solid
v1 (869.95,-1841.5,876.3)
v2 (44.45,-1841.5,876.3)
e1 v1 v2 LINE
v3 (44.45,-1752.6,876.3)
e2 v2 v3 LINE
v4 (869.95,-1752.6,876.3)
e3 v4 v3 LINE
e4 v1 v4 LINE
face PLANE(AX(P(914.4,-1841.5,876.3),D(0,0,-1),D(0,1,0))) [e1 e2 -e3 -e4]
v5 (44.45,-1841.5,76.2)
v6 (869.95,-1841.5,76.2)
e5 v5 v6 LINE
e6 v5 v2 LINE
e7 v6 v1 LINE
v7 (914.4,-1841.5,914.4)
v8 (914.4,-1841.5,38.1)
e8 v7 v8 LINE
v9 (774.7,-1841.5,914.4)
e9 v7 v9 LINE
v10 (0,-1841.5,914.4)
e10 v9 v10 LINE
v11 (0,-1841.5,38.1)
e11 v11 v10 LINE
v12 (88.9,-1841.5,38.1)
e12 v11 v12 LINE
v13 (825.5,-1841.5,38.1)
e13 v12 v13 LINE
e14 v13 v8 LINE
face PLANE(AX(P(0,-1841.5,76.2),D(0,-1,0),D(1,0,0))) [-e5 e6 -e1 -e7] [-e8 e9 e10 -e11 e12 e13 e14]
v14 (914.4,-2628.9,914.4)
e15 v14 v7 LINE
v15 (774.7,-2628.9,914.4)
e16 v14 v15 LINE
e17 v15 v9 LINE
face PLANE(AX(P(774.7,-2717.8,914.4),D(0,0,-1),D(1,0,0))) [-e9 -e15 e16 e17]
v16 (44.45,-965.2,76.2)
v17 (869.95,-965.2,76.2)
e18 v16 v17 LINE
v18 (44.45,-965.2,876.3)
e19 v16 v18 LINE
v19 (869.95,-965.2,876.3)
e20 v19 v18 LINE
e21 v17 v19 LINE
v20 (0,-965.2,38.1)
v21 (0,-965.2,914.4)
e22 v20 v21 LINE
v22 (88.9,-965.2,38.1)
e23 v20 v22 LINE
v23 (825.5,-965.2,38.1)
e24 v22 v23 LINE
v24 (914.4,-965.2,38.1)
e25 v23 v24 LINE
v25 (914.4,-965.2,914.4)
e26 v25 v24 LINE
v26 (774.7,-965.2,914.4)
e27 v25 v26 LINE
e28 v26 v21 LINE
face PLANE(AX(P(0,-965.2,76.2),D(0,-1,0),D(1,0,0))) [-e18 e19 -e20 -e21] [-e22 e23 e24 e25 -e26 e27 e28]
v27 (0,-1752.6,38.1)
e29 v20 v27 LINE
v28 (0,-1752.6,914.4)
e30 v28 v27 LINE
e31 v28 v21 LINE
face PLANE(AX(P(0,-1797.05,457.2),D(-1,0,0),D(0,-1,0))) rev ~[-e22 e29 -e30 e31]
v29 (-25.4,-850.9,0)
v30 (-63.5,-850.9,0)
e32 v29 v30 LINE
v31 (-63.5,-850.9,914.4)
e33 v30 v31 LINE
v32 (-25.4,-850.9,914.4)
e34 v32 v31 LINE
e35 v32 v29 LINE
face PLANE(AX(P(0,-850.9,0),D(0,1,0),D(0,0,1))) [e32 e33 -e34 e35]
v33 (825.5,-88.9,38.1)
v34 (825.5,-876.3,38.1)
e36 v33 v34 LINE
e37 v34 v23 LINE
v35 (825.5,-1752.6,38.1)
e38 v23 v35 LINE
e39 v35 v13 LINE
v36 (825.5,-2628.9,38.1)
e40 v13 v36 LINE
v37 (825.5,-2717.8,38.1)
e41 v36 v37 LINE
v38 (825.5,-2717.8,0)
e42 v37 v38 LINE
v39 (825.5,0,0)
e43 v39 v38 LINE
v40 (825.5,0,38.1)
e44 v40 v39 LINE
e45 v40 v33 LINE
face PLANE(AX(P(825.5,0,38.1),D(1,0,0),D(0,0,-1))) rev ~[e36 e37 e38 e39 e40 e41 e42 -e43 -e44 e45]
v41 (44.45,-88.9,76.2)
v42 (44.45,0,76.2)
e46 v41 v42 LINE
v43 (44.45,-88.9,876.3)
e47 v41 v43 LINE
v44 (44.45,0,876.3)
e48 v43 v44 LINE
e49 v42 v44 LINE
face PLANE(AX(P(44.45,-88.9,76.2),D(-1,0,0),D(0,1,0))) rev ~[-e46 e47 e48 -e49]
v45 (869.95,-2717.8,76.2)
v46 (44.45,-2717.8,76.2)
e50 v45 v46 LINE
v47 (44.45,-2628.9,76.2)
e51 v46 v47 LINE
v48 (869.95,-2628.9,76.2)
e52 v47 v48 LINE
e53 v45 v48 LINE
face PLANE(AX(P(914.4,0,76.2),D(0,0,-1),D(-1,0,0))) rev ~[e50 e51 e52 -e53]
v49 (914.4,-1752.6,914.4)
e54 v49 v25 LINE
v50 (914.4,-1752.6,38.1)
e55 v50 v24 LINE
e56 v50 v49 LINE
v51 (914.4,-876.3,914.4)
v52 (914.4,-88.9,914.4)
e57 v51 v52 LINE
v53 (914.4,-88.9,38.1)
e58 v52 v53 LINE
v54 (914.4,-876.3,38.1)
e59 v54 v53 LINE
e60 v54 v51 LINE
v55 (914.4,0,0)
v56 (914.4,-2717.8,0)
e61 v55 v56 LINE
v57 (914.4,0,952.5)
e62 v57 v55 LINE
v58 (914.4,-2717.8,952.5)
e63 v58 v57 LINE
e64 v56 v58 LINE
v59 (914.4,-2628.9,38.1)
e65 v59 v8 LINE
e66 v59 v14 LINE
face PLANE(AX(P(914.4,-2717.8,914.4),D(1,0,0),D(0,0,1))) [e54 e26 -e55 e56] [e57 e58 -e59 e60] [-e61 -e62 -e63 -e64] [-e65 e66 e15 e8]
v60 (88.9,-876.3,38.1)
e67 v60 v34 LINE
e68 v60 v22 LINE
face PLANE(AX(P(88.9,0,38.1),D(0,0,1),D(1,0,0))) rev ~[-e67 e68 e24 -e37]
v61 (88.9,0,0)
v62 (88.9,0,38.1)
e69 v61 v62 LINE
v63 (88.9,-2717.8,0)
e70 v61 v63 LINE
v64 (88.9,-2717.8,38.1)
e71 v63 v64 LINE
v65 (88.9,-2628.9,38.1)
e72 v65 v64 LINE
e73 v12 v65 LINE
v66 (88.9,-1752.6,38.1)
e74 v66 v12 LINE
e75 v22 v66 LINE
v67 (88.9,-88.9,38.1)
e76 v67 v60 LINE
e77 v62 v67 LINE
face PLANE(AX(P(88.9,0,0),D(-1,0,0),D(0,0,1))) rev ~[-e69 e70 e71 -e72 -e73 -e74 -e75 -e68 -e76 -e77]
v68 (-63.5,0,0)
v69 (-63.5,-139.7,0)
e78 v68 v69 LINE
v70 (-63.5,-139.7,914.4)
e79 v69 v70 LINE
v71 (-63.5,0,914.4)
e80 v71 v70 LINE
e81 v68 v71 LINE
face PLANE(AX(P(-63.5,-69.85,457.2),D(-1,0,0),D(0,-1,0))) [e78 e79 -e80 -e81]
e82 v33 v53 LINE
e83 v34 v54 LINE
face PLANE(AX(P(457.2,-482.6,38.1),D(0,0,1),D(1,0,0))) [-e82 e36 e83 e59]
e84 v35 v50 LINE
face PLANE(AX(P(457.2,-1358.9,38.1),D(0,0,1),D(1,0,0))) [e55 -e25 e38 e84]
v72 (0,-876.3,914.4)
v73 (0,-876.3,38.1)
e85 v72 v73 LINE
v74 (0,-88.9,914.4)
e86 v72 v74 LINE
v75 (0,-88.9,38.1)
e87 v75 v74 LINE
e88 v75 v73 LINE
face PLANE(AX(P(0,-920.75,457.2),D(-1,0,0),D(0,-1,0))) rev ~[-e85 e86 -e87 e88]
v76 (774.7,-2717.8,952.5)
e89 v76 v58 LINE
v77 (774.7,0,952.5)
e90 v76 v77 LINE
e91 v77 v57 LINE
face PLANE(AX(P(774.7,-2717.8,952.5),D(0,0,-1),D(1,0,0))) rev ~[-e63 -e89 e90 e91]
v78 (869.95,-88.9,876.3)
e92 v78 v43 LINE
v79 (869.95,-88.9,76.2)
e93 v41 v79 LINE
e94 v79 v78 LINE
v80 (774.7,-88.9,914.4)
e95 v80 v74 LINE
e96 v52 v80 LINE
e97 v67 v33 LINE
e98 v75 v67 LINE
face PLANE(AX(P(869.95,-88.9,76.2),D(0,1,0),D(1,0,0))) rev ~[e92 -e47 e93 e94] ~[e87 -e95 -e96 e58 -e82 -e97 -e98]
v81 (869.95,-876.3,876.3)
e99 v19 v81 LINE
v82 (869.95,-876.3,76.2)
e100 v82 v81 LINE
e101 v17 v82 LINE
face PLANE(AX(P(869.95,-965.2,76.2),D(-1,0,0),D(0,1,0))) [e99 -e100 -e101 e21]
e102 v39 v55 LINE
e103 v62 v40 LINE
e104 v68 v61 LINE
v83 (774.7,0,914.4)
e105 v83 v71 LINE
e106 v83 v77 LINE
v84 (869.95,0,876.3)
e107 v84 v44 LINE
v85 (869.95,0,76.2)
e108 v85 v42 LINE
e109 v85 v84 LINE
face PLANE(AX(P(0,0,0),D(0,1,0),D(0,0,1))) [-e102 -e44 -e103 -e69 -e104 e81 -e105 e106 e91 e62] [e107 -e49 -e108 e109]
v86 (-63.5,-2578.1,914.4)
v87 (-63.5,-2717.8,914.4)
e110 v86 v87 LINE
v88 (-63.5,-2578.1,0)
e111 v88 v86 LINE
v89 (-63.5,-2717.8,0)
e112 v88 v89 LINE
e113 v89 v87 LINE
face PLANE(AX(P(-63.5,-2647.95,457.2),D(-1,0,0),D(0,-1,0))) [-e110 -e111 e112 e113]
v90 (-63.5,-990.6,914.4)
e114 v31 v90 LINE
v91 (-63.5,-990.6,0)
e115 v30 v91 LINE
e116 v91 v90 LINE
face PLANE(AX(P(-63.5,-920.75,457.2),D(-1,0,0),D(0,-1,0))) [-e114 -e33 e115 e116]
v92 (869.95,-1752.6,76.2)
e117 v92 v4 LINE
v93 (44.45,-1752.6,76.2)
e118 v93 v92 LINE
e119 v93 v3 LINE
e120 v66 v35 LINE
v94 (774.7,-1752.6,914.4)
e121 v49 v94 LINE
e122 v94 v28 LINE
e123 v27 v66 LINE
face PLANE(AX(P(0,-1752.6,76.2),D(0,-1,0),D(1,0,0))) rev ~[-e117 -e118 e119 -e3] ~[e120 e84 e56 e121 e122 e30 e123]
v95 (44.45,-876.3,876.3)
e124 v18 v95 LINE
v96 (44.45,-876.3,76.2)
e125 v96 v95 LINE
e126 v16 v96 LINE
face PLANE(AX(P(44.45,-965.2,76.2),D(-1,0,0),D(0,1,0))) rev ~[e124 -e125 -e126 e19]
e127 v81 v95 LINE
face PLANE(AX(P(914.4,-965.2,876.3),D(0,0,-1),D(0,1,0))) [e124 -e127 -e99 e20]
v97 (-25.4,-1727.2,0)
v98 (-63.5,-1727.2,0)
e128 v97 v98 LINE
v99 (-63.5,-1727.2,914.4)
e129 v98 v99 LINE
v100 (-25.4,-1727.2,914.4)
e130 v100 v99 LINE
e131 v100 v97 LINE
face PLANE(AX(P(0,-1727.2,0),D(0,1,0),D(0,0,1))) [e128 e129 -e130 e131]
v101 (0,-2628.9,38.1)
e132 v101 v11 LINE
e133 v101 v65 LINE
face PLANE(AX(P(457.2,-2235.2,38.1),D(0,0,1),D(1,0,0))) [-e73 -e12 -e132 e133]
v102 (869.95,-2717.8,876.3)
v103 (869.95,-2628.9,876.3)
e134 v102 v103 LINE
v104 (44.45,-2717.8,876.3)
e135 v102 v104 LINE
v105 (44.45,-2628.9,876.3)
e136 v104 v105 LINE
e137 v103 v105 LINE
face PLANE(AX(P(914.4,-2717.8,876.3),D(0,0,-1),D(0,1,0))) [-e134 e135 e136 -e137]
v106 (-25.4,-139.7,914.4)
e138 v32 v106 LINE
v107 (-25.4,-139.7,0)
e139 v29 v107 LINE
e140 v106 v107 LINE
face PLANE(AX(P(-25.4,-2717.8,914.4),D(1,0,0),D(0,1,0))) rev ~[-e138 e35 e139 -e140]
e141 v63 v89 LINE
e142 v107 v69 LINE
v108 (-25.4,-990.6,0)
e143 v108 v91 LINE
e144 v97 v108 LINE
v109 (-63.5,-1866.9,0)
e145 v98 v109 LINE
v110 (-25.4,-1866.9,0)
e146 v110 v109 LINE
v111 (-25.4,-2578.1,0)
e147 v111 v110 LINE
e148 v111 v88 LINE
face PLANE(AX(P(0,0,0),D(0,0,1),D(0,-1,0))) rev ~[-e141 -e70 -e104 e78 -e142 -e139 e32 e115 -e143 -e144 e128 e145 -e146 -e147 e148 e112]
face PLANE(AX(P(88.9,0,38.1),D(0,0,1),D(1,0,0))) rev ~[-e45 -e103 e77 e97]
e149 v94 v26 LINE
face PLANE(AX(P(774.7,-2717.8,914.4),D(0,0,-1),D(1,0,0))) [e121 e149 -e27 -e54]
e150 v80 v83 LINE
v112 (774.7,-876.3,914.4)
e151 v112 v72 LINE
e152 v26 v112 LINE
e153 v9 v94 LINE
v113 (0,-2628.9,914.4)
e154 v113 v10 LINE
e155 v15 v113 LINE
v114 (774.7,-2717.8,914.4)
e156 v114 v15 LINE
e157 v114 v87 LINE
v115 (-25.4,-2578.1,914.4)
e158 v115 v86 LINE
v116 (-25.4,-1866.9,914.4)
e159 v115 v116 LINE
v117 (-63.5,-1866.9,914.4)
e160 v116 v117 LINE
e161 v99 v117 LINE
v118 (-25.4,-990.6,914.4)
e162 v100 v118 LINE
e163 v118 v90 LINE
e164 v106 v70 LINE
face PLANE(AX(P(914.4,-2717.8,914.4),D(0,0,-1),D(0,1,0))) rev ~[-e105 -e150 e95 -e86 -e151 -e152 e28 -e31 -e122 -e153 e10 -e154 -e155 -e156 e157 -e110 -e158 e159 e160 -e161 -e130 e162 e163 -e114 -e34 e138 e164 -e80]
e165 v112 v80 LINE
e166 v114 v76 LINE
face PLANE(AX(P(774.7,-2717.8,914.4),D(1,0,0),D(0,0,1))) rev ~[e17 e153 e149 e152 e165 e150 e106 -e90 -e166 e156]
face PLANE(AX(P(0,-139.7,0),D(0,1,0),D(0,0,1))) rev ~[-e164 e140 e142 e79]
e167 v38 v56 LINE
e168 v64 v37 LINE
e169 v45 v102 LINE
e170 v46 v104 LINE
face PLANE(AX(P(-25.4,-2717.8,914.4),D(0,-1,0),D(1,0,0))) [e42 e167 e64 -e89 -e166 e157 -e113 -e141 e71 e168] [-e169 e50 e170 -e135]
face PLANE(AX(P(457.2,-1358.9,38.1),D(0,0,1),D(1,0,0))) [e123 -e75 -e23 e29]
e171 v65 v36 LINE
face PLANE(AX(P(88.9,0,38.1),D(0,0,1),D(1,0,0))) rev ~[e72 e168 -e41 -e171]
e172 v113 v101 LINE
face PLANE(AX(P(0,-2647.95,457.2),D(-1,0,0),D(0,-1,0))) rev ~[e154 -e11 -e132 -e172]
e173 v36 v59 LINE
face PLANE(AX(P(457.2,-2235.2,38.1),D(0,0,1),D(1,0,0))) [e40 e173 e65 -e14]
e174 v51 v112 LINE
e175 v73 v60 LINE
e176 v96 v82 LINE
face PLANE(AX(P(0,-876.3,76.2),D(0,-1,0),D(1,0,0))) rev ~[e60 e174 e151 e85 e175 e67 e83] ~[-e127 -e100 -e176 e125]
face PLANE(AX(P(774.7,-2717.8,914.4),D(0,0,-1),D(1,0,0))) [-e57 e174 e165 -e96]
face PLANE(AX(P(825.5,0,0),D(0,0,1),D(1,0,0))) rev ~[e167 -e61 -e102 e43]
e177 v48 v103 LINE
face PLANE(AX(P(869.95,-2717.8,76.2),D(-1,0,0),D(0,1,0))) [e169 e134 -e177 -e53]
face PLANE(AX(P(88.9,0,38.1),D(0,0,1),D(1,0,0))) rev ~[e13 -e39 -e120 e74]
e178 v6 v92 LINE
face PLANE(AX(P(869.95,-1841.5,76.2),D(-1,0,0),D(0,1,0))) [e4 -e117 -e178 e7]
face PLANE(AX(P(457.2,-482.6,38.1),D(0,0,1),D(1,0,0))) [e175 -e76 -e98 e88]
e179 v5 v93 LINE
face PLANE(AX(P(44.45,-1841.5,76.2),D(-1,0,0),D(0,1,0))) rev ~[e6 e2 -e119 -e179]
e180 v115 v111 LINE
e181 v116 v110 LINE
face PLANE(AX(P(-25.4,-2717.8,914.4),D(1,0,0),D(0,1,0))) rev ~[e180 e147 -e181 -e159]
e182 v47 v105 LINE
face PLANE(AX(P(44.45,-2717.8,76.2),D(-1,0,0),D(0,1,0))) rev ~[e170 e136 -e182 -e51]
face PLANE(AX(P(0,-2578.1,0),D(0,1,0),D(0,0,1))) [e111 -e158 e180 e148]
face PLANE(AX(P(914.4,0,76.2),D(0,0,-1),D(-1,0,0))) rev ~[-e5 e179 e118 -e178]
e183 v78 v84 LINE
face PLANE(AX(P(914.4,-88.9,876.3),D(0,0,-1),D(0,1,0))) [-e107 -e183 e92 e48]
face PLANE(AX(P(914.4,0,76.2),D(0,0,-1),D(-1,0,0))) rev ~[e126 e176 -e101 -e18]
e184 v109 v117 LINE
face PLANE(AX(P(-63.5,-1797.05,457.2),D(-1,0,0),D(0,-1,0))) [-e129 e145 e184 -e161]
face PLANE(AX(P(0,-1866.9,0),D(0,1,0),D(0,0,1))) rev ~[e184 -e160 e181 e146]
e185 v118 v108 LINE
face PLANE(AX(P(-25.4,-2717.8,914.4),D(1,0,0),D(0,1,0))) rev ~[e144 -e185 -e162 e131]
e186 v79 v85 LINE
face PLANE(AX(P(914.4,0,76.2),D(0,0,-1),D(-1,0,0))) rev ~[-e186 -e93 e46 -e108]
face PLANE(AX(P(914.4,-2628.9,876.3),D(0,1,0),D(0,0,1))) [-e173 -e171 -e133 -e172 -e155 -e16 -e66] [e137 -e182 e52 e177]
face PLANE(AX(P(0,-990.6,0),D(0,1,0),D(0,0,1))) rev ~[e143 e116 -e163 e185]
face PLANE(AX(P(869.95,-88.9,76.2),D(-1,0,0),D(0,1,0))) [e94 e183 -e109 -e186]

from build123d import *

# Parameters (mm, degrees)
F1_DEPTH  = 2717.8
F2_W      = 914.4
F2_H      = 787.4
F3_DEPTH  = 38.1
F4_W      = 44.45
F4_H      = 88.9
F5_DEPTH  = 800.1
F6_W      = 88.9
F6_H      = 38.1
F7_DEPTH  = 914.4
F8_W      = 139.7
F8_H      = 38.1
F9_DEPTH  = 2717.8
F10_W     = 139.7
F10_H     = 914.4
F11_DEPTH = 63.5
F12_W     = 25.4
F12_H     = 2717.8
F13_DEPTH = 914.4


with BuildPart() as f1:
    # F0 (on Front) → F1 (new body)
    with BuildSketch(Plane.XZ):
        Polygon((0, 76.2), (0, 0), (88.9, 0), (88.9, 38.1), (825.5, 38.1), (825.5, 0), (914.4, 0), (914.4, 76.2), align=None)
    extrude(amount=F1_DEPTH)

    # F2 (on face) → F3 (cut)
    with BuildSketch(Plane.XY.offset(76.2)):
        with Locations((457.2, -2235.2)):
            Rectangle(F2_W, F2_H)
        with Locations((457.2, -1358.9)):
            Rectangle(F2_W, F2_H)
        with Locations((457.2, -482.6)):
            Rectangle(F2_W, F2_H)
    extrude(amount=-F3_DEPTH, mode=Mode.SUBTRACT)

    # F4 (on face) → F5 (join)
    with BuildSketch(Plane.XY.offset(76.2)):
        with Locations((892.175, -44.45)):
            Rectangle(F4_W, F4_H)
        with Locations((22.225, -44.45)):
            Rectangle(F4_W, F4_H)
        with Locations((22.225, -920.75)):
            Rectangle(F4_W, F4_H)
        with Locations((892.175, -920.75)):
            Rectangle(F4_W, F4_H)
        with Locations((892.175, -1797.05)):
            Rectangle(F4_W, F4_H)
        with Locations((22.225, -1797.05)):
            Rectangle(F4_W, F4_H)
        with Locations((22.225, -2673.35)):
            Rectangle(F4_W, F4_H)
        with Locations((892.175, -2673.35)):
            Rectangle(F4_W, F4_H)
    extrude(amount=F5_DEPTH)

    # F6 (on face) → F7 (join)
    with BuildSketch(Plane.YZ.offset(914.4)):
        with Locations((-2673.35, 895.35)):
            Rectangle(F6_W, F6_H)
        with Locations((-44.45, 895.35)):
            Rectangle(F6_W, F6_H)
        with Locations((-1797.05, 895.35)):
            Rectangle(F6_W, F6_H)
        with Locations((-920.75, 895.35)):
            Rectangle(F6_W, F6_H)
    extrude(amount=-F7_DEPTH)

    # F8 (on face) → F9 (join)
    with BuildSketch(Plane.XZ.offset(2717.8)):
        with Locations((844.55, 933.45)):
            Rectangle(F8_W, F8_H)
    extrude(amount=-F9_DEPTH)

    # F10 (on face) → F11 (join)
    with BuildSketch(Plane(origin=(0, 0, 0), x_dir=(0, -1, 0), z_dir=(-1, 0, 0))):
        with Locations((69.85, 457.2)):
            Rectangle(F10_W, F10_H)
        with Locations((2647.95, 457.2)):
            Rectangle(F10_W, F10_H)
        with Locations((920.75, 457.2)):
            Rectangle(F10_W, F10_H)
        with Locations((1797.05, 457.2)):
            Rectangle(F10_W, F10_H)
    extrude(amount=F11_DEPTH)

    # F12 (on face) → F13 (join)
    with BuildSketch(Plane.XY.offset(914.4)):
        with Locations((-12.7, -1358.9)):
            Rectangle(F12_W, F12_H)
    extrude(amount=-F13_DEPTH)


solid = f1.part
